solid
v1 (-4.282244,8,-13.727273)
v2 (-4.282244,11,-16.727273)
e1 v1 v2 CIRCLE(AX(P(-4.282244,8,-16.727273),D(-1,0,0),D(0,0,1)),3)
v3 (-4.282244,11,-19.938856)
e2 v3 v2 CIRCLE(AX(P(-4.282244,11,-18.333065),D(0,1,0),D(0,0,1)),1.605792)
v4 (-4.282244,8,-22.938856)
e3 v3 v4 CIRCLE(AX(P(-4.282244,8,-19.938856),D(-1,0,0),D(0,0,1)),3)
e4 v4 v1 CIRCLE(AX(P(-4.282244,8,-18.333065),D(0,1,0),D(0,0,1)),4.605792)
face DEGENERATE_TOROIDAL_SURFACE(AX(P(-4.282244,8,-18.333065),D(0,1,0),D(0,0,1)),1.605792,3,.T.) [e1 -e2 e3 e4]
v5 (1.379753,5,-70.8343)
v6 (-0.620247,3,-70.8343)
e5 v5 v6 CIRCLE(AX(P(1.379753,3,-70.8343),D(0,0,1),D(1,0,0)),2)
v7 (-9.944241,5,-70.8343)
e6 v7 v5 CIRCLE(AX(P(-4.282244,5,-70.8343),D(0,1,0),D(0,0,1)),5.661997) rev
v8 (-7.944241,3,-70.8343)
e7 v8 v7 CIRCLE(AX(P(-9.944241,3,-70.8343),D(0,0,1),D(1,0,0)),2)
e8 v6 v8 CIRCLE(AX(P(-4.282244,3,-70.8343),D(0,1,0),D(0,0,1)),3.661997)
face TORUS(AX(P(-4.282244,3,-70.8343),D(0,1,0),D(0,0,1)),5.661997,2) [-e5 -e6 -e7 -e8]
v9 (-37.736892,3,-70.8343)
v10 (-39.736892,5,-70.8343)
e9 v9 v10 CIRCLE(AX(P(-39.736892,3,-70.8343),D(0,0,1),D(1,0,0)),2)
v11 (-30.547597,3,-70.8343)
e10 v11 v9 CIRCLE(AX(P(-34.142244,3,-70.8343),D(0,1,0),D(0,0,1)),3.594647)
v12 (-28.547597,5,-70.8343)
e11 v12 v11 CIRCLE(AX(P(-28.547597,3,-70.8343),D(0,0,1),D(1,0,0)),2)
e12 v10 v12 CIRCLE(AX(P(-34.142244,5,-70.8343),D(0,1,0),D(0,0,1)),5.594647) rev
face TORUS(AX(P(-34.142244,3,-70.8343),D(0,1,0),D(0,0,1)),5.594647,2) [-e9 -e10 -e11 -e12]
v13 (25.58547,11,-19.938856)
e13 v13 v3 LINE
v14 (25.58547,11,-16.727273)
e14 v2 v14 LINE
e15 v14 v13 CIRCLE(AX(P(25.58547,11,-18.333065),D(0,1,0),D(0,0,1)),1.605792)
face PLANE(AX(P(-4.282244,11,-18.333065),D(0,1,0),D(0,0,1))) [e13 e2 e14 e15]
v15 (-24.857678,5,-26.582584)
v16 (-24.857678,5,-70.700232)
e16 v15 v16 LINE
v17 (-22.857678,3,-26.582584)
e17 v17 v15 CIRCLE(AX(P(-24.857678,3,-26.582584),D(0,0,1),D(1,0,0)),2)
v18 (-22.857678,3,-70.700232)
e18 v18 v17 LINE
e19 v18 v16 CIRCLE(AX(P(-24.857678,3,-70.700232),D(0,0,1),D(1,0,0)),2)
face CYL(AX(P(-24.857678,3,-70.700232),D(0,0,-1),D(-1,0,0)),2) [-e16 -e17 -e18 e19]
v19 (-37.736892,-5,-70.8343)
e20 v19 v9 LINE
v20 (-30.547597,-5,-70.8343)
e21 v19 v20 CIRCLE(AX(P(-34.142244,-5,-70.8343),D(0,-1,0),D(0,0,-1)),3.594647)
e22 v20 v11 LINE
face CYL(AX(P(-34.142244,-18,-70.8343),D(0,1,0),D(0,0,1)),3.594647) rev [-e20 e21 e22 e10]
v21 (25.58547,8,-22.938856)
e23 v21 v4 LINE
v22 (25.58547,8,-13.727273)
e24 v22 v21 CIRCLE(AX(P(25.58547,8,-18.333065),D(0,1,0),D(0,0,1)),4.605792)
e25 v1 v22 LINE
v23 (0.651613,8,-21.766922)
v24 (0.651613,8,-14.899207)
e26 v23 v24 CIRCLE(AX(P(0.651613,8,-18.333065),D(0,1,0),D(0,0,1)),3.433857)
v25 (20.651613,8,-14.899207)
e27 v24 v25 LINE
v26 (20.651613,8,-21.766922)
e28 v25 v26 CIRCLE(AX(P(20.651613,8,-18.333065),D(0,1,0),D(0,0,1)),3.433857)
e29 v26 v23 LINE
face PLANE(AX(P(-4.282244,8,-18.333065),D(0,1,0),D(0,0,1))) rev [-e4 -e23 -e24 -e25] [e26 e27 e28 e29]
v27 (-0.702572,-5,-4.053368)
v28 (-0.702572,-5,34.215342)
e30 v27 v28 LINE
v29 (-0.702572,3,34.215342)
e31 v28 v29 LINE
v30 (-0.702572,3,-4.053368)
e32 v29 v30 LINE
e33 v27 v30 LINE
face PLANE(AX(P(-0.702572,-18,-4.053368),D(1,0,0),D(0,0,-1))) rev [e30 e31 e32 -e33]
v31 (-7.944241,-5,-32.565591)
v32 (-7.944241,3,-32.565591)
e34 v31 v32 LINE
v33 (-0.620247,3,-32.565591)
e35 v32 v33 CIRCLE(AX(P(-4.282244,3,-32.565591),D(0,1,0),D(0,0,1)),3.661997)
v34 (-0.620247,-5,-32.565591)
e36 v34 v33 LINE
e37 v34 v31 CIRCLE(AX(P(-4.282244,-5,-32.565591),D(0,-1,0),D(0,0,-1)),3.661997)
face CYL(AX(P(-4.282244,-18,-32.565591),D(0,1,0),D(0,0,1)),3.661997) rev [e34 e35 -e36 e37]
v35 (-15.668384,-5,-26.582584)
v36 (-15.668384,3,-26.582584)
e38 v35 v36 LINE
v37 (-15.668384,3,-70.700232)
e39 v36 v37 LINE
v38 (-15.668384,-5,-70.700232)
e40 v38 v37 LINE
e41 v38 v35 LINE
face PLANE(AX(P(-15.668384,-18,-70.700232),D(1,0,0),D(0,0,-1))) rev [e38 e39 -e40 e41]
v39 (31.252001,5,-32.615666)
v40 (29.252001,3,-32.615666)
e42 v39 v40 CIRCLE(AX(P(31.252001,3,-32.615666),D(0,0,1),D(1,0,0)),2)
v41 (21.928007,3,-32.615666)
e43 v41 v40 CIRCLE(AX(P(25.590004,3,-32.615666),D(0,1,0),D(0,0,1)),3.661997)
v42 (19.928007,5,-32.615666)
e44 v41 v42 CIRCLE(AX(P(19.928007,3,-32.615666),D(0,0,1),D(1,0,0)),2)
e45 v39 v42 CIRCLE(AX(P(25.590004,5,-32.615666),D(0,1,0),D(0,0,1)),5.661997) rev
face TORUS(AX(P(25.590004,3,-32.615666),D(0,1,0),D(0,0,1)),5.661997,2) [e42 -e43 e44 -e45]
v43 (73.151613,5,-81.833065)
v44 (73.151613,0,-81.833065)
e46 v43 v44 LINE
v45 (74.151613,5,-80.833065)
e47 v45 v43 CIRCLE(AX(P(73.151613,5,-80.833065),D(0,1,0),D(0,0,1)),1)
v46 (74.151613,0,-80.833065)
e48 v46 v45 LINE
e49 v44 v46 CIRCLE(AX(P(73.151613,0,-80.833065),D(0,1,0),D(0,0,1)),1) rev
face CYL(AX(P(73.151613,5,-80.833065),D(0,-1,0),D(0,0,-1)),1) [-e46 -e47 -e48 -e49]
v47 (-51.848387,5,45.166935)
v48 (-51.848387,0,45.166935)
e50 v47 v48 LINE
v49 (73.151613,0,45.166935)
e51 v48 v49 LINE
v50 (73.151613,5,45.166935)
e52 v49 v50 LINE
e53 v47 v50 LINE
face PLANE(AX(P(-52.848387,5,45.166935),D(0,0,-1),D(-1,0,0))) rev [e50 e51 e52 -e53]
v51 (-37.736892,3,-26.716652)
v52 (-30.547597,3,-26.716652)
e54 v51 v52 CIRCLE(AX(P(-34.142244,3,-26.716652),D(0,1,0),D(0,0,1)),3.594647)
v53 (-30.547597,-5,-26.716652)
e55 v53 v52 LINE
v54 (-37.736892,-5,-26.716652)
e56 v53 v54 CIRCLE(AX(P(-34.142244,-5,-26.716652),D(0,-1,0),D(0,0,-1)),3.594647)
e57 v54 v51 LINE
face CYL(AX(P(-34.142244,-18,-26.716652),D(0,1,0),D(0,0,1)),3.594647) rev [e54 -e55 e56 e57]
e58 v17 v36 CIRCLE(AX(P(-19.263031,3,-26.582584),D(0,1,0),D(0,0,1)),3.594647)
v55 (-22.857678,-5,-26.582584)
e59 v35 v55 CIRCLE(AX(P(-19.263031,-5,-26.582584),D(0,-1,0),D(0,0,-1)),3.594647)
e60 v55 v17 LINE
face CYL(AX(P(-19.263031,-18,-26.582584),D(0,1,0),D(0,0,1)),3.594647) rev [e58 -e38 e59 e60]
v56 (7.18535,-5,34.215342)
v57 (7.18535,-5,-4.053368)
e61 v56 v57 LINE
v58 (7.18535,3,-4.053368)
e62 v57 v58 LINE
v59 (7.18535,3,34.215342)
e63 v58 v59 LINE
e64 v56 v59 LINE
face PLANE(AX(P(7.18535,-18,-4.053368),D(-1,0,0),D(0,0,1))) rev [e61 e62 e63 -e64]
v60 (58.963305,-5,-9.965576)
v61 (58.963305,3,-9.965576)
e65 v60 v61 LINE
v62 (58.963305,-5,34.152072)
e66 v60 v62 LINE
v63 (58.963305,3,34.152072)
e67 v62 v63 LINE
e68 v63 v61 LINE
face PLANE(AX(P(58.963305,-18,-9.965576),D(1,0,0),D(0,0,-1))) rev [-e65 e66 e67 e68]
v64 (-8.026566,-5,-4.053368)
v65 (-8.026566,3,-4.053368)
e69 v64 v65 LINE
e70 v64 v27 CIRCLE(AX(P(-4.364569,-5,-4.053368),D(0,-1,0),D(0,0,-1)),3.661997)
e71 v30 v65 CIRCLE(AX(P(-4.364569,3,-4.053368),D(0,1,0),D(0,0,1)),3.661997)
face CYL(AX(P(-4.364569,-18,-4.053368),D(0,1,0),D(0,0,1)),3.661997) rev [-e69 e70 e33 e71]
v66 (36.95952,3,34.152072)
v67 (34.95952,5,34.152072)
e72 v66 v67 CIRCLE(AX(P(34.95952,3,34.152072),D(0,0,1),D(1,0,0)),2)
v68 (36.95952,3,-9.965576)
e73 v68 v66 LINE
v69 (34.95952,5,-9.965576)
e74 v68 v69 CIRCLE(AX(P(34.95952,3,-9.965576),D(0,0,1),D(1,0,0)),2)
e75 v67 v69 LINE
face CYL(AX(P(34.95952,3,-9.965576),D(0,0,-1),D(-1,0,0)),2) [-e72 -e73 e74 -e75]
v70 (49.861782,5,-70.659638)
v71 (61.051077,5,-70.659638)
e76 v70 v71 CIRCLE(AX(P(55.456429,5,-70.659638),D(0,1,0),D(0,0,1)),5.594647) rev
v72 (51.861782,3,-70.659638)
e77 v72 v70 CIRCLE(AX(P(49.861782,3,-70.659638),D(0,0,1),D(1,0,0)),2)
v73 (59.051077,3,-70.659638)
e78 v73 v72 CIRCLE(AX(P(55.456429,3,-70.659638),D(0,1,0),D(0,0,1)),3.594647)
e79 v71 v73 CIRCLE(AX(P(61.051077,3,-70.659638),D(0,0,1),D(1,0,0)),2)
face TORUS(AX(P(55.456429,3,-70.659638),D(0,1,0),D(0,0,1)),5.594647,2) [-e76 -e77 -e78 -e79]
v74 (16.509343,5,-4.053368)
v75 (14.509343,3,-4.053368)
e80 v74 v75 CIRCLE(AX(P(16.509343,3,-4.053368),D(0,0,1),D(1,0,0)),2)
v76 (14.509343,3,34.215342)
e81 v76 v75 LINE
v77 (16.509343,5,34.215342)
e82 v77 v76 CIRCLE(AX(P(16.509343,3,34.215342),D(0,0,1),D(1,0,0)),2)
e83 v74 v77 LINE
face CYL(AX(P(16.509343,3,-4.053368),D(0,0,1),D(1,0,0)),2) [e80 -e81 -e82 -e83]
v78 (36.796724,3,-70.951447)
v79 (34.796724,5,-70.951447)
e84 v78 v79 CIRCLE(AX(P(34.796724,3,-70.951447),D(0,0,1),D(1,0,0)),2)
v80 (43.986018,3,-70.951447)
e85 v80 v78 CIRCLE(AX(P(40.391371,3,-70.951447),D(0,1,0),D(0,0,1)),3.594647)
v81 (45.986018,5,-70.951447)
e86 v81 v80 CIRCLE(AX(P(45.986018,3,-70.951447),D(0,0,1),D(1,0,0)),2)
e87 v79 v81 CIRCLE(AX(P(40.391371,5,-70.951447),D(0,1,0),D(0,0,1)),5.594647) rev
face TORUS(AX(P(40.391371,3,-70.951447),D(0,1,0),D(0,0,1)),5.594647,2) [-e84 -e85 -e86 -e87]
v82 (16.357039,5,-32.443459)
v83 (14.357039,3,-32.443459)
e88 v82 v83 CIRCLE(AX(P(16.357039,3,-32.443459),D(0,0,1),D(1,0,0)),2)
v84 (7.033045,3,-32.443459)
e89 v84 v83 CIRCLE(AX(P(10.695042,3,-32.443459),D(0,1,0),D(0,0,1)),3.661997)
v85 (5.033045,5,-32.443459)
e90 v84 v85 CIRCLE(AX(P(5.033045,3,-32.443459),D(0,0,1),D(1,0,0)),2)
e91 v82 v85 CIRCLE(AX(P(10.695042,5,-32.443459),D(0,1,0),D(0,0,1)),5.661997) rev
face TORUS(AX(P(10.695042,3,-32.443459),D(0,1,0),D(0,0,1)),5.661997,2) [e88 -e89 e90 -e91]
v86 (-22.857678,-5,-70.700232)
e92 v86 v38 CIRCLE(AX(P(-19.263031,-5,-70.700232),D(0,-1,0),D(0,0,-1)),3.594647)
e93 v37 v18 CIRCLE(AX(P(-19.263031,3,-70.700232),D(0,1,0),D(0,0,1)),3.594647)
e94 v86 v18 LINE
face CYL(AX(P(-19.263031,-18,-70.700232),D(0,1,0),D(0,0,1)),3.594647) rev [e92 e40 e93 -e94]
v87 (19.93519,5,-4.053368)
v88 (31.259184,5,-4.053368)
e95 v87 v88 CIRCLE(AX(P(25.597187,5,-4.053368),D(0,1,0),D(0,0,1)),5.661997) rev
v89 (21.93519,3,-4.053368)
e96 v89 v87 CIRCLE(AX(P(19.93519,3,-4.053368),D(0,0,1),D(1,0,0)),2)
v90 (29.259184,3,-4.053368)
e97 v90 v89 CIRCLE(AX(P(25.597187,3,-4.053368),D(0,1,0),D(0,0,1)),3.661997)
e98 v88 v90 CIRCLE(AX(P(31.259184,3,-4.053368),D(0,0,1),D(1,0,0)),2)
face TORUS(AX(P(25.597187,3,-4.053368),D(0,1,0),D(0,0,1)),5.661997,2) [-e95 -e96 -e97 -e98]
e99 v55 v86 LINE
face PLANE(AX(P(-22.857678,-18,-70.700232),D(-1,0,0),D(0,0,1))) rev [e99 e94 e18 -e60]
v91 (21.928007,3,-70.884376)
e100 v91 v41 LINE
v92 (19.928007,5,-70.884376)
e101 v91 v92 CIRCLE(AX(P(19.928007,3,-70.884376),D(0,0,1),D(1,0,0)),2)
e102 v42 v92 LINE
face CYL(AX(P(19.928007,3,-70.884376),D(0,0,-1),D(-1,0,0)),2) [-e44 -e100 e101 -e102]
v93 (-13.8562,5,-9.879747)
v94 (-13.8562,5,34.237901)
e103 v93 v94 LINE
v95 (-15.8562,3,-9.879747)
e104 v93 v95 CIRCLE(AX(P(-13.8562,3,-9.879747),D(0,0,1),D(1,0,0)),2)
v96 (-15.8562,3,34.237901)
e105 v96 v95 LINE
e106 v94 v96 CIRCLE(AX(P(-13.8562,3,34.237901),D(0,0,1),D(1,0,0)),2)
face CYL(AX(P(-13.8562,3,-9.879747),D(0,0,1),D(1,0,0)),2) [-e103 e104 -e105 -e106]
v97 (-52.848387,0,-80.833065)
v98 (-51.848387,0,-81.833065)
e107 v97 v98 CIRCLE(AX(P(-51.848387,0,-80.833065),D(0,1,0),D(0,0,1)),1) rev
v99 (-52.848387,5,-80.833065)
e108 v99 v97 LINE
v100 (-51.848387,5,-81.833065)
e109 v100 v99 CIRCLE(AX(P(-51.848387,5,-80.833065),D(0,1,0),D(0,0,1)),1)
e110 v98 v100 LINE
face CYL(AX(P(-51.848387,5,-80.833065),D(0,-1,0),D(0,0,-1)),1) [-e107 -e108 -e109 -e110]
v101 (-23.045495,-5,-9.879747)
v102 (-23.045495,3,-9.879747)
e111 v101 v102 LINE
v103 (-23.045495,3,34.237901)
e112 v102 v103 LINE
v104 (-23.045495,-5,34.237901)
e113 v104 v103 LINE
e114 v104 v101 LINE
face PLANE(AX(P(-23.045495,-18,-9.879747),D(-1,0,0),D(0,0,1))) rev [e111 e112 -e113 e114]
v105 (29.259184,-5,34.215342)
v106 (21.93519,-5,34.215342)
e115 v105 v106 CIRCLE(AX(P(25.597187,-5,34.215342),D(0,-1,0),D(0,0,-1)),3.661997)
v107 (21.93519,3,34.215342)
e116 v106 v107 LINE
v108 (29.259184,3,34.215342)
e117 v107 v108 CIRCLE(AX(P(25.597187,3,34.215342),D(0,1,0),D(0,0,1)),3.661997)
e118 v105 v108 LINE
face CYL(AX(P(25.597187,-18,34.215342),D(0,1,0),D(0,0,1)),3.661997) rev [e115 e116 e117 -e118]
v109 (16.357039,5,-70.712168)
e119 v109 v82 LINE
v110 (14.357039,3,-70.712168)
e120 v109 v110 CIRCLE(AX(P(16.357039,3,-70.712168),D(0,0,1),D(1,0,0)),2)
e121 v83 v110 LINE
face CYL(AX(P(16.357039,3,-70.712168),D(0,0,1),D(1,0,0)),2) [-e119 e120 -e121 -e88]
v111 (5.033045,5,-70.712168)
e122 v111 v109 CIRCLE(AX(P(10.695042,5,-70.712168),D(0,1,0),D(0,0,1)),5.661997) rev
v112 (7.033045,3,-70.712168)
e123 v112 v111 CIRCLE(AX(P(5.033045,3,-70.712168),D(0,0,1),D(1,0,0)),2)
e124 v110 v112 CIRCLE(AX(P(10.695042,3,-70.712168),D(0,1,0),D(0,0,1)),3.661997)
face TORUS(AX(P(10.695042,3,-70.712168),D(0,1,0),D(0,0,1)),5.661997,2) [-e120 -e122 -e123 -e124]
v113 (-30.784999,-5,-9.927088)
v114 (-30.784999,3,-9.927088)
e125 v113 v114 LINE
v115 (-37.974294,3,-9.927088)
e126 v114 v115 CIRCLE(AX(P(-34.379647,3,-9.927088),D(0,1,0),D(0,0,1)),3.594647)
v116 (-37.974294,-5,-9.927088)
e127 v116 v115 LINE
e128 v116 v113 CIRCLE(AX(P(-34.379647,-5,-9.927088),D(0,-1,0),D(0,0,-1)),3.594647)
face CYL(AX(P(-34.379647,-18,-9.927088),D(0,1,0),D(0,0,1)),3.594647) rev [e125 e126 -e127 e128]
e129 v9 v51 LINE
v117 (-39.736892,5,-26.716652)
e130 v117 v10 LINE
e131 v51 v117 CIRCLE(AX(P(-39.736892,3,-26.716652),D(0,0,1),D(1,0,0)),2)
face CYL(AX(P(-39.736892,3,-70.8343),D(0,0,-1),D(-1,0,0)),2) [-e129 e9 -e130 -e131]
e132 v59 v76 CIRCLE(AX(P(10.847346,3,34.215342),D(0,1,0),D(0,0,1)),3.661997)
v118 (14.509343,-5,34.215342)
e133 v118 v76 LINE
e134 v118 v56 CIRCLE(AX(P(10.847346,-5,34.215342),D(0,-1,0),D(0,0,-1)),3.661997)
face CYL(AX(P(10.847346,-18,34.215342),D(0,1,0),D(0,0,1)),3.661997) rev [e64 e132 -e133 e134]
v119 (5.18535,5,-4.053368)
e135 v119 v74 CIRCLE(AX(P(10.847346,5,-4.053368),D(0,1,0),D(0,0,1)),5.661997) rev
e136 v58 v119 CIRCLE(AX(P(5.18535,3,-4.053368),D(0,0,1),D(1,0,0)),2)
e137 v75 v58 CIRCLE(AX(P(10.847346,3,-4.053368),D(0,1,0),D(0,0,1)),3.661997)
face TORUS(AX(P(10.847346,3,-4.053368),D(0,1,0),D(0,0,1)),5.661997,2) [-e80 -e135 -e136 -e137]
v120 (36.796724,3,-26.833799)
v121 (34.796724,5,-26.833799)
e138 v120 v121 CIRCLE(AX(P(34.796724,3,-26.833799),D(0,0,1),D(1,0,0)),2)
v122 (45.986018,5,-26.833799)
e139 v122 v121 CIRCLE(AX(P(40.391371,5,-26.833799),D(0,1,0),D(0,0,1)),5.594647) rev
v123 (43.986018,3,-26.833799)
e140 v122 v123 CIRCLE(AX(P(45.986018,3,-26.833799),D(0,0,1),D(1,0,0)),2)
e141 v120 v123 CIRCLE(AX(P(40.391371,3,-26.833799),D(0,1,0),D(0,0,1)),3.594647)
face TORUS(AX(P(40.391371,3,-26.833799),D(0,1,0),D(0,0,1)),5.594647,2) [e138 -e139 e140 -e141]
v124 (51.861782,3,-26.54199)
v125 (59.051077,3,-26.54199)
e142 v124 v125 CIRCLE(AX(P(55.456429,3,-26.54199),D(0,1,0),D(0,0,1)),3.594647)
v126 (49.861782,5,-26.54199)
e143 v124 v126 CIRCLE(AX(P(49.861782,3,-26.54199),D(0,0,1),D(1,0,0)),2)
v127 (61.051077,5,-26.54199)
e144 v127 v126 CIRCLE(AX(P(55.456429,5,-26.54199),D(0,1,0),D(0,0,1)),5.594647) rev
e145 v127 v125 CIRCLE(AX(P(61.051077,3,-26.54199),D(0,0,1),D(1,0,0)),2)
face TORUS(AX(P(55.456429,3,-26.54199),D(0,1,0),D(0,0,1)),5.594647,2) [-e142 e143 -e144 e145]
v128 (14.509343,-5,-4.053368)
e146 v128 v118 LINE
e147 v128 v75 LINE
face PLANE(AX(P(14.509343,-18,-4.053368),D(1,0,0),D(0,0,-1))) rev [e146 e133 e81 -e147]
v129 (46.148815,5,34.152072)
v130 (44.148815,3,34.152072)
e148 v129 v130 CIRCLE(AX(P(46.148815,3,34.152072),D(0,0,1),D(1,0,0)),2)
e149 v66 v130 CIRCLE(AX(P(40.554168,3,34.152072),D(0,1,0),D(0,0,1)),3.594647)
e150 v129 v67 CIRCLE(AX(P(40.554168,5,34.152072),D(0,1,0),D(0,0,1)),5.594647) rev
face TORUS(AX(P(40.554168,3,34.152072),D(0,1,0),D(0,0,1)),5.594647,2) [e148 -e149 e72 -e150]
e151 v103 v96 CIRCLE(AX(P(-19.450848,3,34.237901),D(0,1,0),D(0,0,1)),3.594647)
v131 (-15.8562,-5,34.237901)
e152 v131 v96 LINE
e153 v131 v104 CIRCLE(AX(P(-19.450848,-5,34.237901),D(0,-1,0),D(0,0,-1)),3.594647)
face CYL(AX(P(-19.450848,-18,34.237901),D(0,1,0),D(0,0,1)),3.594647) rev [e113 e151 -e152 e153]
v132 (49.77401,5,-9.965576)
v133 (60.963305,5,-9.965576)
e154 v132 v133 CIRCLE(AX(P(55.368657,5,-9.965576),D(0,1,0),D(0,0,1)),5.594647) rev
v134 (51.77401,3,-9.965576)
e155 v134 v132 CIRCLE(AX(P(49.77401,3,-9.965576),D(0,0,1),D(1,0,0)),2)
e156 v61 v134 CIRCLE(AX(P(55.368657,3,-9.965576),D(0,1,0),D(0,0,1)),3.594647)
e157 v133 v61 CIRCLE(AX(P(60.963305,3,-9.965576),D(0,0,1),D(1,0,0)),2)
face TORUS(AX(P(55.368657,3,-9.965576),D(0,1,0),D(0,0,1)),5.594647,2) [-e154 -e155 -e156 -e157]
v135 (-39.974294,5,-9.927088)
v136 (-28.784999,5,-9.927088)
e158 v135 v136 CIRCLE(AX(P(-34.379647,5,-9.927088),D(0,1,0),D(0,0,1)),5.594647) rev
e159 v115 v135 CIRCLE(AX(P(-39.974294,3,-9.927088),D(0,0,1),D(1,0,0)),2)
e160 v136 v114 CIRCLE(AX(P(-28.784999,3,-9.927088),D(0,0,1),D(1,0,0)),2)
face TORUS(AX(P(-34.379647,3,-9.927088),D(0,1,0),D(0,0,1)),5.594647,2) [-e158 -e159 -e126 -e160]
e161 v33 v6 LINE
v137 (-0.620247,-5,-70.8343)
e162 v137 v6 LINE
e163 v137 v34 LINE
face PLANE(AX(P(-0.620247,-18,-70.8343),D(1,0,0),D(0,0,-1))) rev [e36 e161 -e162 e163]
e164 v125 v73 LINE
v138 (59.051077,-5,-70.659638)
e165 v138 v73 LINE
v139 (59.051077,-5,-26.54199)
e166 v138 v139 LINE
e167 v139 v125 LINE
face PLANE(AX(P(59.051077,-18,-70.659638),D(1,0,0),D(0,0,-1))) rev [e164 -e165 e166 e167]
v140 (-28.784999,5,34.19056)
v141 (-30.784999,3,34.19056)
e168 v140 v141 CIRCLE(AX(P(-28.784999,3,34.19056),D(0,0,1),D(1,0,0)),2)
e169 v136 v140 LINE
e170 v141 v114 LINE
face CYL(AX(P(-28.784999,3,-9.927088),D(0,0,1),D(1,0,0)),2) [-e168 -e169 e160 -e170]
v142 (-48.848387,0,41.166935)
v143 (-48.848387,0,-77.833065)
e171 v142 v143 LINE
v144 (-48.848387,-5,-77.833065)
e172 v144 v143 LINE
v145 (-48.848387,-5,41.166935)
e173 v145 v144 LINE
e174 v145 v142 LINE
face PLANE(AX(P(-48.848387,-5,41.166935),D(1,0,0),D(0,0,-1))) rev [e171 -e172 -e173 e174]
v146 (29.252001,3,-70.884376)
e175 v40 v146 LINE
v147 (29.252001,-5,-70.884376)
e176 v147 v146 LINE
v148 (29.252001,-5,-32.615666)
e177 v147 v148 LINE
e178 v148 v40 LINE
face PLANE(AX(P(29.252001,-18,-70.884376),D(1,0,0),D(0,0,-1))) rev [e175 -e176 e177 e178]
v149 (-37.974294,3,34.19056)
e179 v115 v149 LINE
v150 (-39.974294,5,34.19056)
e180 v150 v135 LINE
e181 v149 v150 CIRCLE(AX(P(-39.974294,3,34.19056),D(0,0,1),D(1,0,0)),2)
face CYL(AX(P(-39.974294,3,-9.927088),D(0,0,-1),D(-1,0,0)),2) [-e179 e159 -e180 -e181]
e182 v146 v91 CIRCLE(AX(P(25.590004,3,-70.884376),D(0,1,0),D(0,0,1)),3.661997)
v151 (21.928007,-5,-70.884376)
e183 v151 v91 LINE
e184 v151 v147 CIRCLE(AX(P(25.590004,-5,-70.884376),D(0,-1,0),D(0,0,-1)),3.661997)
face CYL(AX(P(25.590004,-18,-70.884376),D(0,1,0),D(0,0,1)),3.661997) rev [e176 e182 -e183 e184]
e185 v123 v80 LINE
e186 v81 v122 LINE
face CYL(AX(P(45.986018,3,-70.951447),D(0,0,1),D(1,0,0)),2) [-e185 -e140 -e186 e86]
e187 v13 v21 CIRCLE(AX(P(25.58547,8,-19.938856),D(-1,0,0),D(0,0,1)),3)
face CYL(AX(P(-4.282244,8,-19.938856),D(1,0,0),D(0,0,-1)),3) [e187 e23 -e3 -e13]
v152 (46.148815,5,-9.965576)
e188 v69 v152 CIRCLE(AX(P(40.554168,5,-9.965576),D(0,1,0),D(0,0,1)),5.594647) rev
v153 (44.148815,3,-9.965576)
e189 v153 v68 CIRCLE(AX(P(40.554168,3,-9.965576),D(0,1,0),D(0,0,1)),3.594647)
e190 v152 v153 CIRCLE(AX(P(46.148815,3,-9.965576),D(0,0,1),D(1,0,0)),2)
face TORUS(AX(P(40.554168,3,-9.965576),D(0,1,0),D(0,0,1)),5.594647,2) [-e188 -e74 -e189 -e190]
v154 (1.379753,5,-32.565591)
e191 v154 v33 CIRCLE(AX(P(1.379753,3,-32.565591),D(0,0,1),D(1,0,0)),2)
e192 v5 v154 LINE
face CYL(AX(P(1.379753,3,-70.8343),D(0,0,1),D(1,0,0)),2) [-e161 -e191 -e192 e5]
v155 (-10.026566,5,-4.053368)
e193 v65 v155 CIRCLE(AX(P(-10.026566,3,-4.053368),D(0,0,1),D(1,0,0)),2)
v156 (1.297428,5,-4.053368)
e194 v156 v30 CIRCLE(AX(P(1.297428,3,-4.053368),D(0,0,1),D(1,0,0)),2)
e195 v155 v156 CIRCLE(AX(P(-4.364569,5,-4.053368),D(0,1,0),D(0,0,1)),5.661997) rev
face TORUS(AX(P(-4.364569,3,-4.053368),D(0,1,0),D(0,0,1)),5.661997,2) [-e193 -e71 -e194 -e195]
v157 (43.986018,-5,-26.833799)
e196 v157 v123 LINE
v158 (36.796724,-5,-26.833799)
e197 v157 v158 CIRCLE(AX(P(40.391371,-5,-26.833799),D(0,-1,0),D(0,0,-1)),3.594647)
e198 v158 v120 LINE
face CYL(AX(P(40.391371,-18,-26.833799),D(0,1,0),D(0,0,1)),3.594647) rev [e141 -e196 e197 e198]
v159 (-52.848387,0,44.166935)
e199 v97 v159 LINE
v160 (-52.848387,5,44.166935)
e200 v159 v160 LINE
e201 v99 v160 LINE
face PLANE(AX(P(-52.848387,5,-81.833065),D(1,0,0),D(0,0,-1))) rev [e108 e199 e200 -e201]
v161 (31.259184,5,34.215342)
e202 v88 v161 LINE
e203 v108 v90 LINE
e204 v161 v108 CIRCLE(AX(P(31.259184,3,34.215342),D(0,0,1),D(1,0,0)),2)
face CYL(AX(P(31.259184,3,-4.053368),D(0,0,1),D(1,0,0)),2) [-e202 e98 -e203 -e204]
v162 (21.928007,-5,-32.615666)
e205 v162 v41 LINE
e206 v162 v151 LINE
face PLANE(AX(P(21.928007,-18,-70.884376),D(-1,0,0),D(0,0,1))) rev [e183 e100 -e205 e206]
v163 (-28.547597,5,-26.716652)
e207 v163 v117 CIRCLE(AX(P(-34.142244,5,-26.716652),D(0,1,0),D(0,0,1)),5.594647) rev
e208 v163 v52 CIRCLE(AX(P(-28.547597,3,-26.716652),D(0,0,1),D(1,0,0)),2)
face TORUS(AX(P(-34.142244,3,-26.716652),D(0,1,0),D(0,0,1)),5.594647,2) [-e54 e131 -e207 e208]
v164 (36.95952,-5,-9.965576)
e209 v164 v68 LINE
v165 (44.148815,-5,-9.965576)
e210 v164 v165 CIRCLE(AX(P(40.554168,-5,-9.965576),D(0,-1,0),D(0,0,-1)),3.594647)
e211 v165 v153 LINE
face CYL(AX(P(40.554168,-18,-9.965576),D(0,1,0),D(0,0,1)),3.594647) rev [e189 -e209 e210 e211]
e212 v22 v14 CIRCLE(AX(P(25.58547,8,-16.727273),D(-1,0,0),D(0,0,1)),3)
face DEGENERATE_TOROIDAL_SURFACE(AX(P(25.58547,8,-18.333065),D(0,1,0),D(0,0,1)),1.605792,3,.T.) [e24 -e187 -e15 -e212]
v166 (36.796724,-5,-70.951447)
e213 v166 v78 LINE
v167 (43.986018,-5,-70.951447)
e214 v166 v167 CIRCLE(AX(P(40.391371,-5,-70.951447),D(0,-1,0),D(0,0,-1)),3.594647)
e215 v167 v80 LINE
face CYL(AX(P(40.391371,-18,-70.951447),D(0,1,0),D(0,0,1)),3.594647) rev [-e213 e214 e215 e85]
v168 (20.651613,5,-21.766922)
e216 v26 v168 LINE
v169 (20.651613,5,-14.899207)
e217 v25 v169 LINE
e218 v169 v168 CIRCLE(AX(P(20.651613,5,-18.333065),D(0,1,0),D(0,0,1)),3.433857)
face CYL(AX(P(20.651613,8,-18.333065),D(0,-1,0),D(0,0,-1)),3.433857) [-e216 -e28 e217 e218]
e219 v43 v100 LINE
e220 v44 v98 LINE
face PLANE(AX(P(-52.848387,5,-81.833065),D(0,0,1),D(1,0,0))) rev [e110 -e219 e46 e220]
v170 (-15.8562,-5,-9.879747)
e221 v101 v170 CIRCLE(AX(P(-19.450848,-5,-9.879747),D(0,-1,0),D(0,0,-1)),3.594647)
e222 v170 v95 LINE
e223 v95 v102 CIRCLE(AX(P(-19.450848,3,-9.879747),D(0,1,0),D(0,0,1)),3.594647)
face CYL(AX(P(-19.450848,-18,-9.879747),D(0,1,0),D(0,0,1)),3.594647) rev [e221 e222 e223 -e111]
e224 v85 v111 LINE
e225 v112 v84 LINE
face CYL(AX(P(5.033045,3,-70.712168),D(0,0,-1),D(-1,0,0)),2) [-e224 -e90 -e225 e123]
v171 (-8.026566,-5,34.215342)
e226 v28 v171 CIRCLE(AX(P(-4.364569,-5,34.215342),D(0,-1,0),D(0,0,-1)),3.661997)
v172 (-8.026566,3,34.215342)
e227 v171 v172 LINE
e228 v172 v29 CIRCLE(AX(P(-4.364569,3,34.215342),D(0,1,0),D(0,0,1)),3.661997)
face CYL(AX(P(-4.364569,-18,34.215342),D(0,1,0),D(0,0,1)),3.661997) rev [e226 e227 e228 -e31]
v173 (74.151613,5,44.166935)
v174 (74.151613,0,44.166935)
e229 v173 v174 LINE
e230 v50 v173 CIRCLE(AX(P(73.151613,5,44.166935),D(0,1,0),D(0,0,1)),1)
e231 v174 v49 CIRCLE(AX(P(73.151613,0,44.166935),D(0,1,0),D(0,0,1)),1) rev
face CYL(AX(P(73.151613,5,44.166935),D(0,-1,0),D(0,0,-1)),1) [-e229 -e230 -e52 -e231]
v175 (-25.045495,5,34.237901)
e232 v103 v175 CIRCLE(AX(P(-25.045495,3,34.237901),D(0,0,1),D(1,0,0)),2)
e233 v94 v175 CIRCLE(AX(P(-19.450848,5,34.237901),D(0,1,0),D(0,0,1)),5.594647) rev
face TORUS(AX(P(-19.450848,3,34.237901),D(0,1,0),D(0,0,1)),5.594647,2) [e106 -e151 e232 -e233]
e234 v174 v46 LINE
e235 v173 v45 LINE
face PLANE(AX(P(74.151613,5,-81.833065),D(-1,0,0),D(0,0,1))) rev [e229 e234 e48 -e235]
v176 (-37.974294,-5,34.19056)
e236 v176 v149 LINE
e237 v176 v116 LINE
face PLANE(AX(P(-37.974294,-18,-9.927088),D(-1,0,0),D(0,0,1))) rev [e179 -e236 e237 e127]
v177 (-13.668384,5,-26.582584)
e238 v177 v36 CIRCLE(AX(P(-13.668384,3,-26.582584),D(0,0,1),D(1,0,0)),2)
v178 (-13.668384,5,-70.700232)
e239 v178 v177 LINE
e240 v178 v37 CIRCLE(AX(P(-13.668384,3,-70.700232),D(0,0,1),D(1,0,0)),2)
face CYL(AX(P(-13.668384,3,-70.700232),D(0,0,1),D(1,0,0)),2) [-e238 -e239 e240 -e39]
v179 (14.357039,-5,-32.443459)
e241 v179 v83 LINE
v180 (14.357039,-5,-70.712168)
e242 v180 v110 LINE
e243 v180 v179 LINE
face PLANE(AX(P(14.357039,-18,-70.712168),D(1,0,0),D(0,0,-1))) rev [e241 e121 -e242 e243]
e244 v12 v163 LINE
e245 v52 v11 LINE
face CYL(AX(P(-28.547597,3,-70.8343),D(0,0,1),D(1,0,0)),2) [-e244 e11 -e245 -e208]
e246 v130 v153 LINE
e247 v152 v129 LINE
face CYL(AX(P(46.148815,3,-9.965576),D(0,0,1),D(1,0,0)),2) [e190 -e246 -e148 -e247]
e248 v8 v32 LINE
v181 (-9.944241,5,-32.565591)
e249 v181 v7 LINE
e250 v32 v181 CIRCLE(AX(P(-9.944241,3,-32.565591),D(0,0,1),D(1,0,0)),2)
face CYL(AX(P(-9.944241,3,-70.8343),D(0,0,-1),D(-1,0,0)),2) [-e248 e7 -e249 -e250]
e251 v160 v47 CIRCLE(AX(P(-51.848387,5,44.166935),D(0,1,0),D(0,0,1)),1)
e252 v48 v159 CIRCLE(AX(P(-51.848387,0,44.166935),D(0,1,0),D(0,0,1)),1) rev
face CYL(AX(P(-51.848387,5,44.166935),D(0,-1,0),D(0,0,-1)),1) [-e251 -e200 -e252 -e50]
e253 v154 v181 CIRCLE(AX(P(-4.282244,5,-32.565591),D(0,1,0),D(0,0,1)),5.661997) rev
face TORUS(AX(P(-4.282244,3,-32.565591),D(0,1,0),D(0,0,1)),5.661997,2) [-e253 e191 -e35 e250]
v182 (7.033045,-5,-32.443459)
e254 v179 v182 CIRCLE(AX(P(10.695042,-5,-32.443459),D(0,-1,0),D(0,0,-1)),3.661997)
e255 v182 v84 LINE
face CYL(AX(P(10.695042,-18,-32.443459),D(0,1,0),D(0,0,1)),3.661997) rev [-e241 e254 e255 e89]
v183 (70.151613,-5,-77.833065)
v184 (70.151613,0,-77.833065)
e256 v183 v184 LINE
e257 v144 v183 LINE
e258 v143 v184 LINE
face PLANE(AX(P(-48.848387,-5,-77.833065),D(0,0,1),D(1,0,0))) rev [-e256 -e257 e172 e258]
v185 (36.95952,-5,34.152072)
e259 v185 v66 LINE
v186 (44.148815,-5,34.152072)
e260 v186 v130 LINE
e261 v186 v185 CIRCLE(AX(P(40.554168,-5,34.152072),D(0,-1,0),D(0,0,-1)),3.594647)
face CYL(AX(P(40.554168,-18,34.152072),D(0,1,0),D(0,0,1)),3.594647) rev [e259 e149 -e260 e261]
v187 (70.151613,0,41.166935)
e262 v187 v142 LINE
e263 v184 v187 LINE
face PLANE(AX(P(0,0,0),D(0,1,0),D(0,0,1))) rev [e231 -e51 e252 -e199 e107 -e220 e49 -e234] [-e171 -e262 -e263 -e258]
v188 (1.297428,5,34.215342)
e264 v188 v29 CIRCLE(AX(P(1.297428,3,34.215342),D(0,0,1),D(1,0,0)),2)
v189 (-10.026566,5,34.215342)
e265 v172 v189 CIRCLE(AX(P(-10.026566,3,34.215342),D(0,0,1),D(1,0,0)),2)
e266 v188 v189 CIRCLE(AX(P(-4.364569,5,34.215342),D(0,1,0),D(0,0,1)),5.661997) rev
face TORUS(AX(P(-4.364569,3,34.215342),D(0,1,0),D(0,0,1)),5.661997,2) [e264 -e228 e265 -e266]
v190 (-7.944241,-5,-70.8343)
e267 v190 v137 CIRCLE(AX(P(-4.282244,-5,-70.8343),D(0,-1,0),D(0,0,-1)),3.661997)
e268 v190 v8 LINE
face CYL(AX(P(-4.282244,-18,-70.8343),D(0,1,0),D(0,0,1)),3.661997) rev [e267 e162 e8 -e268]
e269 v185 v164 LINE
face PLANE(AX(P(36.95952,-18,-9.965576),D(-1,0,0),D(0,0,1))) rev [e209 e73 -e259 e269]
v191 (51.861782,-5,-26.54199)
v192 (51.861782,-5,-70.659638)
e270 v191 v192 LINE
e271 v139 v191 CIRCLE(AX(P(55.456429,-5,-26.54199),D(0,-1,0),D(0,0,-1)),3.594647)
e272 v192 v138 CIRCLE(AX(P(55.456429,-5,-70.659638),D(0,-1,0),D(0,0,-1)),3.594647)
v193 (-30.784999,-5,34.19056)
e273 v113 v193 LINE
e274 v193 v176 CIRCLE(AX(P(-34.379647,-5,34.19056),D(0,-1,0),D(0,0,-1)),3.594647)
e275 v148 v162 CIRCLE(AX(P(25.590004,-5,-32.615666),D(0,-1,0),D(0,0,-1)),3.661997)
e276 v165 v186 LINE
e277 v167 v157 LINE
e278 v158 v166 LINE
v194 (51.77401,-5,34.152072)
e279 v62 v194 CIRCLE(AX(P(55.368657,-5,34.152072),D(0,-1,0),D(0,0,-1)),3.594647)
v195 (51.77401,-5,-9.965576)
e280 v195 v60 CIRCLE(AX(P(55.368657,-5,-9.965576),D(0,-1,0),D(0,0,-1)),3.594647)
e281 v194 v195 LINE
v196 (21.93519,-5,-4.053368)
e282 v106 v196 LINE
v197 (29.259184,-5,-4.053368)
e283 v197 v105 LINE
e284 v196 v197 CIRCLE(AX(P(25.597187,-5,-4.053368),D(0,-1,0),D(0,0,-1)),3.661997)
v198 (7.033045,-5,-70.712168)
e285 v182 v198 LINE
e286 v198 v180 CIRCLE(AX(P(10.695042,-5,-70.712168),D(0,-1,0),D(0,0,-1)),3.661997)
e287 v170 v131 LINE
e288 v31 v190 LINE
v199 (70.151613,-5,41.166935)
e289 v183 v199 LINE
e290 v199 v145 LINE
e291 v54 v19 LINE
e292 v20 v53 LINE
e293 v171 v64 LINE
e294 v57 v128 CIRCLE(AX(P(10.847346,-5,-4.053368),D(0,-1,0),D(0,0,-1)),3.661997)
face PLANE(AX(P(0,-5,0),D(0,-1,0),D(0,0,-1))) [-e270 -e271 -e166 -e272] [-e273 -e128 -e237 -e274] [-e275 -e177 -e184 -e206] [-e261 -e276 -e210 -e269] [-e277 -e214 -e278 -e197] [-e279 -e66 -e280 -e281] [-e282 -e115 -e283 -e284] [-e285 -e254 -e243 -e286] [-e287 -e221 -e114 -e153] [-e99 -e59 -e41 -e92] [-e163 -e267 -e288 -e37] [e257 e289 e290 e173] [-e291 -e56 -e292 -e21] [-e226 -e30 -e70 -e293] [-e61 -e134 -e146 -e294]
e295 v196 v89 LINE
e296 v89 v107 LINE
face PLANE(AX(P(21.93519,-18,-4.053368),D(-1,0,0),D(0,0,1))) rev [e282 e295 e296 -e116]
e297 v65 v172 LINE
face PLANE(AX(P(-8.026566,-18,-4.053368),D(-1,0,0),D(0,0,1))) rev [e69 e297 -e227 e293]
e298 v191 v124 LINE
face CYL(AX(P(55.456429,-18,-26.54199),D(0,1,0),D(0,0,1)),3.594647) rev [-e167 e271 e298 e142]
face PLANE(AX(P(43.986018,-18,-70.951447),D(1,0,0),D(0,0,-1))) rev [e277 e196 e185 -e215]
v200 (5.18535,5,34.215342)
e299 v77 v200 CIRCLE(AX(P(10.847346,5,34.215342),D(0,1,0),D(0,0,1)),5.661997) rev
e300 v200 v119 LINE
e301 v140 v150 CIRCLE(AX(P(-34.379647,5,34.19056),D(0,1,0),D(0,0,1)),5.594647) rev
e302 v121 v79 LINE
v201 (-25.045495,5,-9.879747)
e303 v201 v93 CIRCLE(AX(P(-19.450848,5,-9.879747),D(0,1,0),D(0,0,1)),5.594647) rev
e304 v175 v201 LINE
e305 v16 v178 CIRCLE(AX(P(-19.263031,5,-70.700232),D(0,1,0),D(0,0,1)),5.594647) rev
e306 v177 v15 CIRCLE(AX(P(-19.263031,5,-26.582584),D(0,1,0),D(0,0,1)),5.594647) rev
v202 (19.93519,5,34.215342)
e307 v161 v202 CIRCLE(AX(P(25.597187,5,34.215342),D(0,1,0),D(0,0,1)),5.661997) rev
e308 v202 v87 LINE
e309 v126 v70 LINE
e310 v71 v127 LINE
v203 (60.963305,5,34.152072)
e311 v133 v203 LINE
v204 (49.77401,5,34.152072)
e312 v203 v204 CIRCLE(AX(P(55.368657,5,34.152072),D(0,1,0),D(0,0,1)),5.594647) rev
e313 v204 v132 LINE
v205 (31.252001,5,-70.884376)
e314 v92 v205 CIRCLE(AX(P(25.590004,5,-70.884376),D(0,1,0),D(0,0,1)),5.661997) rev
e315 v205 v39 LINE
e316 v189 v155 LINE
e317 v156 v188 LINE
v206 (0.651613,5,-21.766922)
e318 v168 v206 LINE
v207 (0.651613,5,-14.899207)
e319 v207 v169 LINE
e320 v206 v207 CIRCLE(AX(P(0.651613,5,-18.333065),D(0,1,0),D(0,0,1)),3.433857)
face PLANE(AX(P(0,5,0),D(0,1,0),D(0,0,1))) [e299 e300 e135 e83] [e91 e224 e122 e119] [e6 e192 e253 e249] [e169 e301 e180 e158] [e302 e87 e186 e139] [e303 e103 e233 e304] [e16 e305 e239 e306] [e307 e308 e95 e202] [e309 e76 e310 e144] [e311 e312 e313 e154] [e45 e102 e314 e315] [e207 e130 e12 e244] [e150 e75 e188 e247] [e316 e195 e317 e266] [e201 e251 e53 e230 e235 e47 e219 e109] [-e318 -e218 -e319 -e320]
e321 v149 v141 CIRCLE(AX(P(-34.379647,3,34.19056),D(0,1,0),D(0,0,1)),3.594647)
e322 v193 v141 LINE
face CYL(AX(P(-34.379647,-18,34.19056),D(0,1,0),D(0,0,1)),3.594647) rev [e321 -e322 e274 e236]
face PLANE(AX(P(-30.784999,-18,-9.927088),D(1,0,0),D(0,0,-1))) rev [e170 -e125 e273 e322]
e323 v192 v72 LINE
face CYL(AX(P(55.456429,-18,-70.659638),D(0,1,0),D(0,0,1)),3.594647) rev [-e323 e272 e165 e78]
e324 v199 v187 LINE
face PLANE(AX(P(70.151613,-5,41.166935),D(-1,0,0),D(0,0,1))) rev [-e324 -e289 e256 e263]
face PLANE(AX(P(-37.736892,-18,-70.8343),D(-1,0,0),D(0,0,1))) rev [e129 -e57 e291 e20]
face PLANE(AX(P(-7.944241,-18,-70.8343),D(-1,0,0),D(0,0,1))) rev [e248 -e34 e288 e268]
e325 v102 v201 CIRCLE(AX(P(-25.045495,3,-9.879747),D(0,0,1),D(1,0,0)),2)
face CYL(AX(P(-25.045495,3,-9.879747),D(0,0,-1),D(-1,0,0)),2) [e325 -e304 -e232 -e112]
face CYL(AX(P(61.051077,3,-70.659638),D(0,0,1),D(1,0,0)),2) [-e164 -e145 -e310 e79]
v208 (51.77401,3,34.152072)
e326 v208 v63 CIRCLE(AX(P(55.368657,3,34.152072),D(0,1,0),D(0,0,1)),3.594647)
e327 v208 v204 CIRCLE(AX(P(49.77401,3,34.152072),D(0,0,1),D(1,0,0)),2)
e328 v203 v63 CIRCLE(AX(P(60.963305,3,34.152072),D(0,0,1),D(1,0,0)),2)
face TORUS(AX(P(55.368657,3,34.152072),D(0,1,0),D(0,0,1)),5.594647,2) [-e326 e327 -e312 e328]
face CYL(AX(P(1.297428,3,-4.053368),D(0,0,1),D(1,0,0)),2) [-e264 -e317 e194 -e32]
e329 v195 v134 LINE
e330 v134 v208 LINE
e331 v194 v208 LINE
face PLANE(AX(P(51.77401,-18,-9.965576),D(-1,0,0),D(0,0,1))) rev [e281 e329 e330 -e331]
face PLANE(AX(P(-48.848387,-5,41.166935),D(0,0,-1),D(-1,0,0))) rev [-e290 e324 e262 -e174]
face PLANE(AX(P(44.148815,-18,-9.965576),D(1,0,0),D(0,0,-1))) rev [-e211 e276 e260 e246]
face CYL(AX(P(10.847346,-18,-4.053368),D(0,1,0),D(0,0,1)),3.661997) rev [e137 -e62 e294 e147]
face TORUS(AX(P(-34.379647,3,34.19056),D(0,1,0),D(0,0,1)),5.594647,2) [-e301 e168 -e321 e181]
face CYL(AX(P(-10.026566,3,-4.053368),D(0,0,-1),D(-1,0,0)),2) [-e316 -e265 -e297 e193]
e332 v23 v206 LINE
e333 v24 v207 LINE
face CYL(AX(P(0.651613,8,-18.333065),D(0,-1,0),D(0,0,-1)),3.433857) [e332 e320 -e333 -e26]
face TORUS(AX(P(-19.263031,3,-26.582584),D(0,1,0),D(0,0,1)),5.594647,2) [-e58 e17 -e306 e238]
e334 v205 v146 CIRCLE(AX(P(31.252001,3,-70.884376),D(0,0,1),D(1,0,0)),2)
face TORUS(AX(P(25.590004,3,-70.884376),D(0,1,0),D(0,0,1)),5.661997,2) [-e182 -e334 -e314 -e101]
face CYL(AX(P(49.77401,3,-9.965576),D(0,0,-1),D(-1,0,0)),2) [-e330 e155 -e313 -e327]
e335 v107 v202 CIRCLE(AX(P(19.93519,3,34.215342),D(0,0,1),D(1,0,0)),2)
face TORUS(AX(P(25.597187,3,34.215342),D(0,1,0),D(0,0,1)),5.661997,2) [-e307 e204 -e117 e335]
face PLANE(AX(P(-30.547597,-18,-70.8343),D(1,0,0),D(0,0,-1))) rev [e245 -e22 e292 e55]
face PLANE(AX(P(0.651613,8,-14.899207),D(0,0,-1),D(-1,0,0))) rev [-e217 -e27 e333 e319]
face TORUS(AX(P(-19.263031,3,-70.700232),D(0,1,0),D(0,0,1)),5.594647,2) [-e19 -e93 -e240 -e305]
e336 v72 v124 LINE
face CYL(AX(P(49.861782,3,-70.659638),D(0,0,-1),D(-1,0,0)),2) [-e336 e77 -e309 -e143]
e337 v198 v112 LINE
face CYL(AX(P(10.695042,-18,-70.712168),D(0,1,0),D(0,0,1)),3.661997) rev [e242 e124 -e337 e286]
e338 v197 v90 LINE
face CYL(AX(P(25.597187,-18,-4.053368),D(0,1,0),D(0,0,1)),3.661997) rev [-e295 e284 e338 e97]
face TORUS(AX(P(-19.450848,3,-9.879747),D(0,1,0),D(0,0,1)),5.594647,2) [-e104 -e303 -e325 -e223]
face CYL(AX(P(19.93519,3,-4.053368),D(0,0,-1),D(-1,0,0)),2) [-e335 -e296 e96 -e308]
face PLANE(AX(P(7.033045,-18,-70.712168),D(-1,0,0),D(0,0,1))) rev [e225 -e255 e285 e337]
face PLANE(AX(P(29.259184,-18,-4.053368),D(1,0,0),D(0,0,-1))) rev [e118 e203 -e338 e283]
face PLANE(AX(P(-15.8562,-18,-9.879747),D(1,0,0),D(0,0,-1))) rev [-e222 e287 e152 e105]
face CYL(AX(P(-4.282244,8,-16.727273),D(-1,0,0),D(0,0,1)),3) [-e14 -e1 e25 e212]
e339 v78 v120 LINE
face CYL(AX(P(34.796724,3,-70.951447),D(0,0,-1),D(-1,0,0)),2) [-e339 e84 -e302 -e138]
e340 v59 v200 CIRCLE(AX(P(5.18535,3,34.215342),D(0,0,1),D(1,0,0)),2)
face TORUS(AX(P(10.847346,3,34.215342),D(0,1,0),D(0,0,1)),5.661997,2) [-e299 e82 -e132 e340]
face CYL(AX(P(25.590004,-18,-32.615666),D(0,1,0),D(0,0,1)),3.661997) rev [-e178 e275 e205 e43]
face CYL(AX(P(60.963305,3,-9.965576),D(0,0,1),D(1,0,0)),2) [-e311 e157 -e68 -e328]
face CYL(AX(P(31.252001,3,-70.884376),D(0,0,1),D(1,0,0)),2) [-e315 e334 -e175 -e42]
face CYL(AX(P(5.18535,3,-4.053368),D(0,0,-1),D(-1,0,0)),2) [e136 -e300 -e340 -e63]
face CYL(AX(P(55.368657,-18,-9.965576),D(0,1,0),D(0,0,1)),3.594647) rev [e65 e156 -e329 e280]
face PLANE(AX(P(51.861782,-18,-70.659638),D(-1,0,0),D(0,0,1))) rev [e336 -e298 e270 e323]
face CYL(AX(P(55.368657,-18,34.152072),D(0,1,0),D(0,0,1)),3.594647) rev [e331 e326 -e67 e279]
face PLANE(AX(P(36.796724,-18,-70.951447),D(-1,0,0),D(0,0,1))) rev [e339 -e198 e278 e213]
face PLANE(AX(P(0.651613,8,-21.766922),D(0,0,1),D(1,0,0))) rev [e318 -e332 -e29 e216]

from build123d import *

# Parameters (mm, degrees)
SKETCH2_W           = 127
SKETCH2_H           = 127
BOSS_EXTRUDE1_DEPTH = 5
SKETCH3_W           = 119
SKETCH3_H           = 119
BOSS_EXTRUDE2_DEPTH = 5
FILLET1_R           = 1
BOSS_EXTRUDE3_DEPTH = 3
BOSS_EXTRUDE4_DEPTH = 3
FILLET2_R           = 3
CUT_EXTRUDE1_DEPTH  = 23
FILLET3_R           = 2


with BuildPart() as part:
    # Sketch2 → Boss-Extrude1 (new body)
    with BuildSketch(Plane(origin=(0, 0, 0), x_dir=(1, 0, 0), z_dir=(0, 1, 0))):
        with Locations((10.651612903, 18.333064516)):
            Rectangle(SKETCH2_W, SKETCH2_H)
    extrude(amount=BOSS_EXTRUDE1_DEPTH)

    # Sketch3 → Boss-Extrude2 (add)
    with BuildSketch(Plane.XZ):
        with Locations((10.651612903, -18.333064516)):
            Rectangle(SKETCH3_W, SKETCH3_H)
    extrude(amount=BOSS_EXTRUDE2_DEPTH)

    # Fillet1
    fillet1_edges = [part.edges().sort_by_distance(p)[0] for p in [
        (-52.848387097, 2.5, -81.833064516),
        (74.151612903, 2.5, -81.833064516),
        (74.151612903, 2.5, 45.166935484),
        (-52.848387097, 2.5, 45.166935484),
    ]]
    fillet(fillet1_edges, radius=FILLET1_R)

    # Sketch4 → Boss-Extrude3 (add)
    with BuildSketch(Plane(origin=(0, 5, 0), x_dir=(1, 0, 0), z_dir=(0, 1, 0))):
        with BuildLine():
            Line((0.651612903, 21.766921577), (20.651612903, 21.766921577))
            ThreePointArc((20.651612903, 21.766921577), (24.085469965, 18.333064516), (20.651612903, 14.899207455))
            Line((20.651612903, 14.899207455), (0.651612903, 14.899207455))
            ThreePointArc((0.651612903, 14.899207455), (-2.782244158, 18.333064516), (0.651612903, 21.766921577))
        make_face()
    extrude(amount=BOSS_EXTRUDE3_DEPTH)

    # Sketch5 → Boss-Extrude4 (add)
    with BuildSketch(Plane(origin=(0, 8, 0), x_dir=(1, 0, 0), z_dir=(0, 1, 0))):
        with BuildLine():
            Line((-4.282244158, 22.938856154), (25.585469965, 22.938856154))
            ThreePointArc((25.585469965, 22.938856154), (30.191261602, 18.333064516), (25.585469965, 13.727272878))
            Line((25.585469965, 13.727272878), (-4.282244158, 13.727272878))
            ThreePointArc((-4.282244158, 13.727272878), (-8.888035796, 18.333064516), (-4.282244158, 22.938856154))
        make_face()
    extrude(amount=BOSS_EXTRUDE4_DEPTH)

    # Fillet2
    fillet2_edges = [part.edges().sort_by_distance(p)[0] for p in [
        (-8.888035796, 11, -18.333064516),
        (10.651612903, 11, -22.938856154),
        (30.191261602, 11, -18.333064516),
        (10.651612903, 11, -13.727272878),
    ]]
    fillet(fillet2_edges, radius=FILLET2_R - 0.0001)  # a hair under: the kernel refuses the full size

    # Sketch6 → Cut-Extrude1 (cut)
    with BuildSketch(Plane(origin=(0, 5, 0), x_dir=(1, 0, 0), z_dir=(0, 1, 0))):
        with BuildLine():
            Line((-30.54759674, 70.834300294), (-30.54759674, 26.716652323))
            ThreePointArc((-30.54759674, 26.716652323), (-34.142244158, 23.122004906), (-37.736891576, 26.716652323))
            Line((-37.736891576, 26.716652323), (-37.736891576, 70.834300294))
            ThreePointArc((-37.736891576, 70.834300294), (-34.142244158, 74.428947712), (-30.54759674, 70.834300294))
        make_face()
        with BuildLine():
            Line((-15.668383644, 70.700231666), (-15.668383644, 26.582583695))
            ThreePointArc((-15.668383644, 26.582583695), (-19.263031062, 22.987936277), (-22.857678479, 26.582583695))
            Line((-22.857678479, 26.582583695), (-22.857678479, 70.700231666))
            ThreePointArc((-22.857678479, 70.700231666), (-19.263031062, 74.294879084), (-15.668383644, 70.700231666))
        make_face()
        with BuildLine():
            Line((43.986018434, 70.951447075), (43.986018434, 26.833799104))
            ThreePointArc((43.986018434, 26.833799104), (40.391371017, 23.239151686), (36.796723599, 26.833799104))
            Line((36.796723599, 26.833799104), (36.796723599, 70.951447075))
            ThreePointArc((36.796723599, 70.951447075), (40.391371017, 74.546094493), (43.986018434, 70.951447075))
        make_face()
        with BuildLine():
            Line((59.051076502, 70.659638364), (59.051076502, 26.541990393))
            ThreePointArc((59.051076502, 26.541990393), (55.456429084, 22.947342975), (51.861781666, 26.541990393))
            Line((51.861781666, 26.541990393), (51.861781666, 70.659638364))
            ThreePointArc((51.861781666, 70.659638364), (55.456429084, 74.254285782), (59.051076502, 70.659638364))
        make_face()
        with BuildLine():
            Line((-30.784999095, 9.927087611), (-30.784999095, -34.19056036))
            ThreePointArc((-30.784999095, -34.19056036), (-34.379646512, -37.785207778), (-37.97429393, -34.19056036))
            Line((-37.97429393, -34.19056036), (-37.97429393, 9.927087611))
            ThreePointArc((-37.97429393, 9.927087611), (-34.379646512, 13.521735029), (-30.784999095, 9.927087611))
        make_face()
        with BuildLine():
            Line((-15.856200447, 9.879746798), (-15.856200447, -34.237901173))
            ThreePointArc((-15.856200447, -34.237901173), (-19.450847865, -37.832548591), (-23.045495283, -34.237901173))
            Line((-23.045495283, -34.237901173), (-23.045495283, 9.879746798))
            ThreePointArc((-23.045495283, 9.879746798), (-19.450847865, 13.474394216), (-15.856200447, 9.879746798))
        make_face()
        with BuildLine():
            Line((44.148815025, 9.965576219), (44.148815025, -34.152071752))
            ThreePointArc((44.148815025, -34.152071752), (40.554167607, -37.74671917), (36.959520189, -34.152071752))
            Line((36.959520189, -34.152071752), (36.959520189, 9.965576219))
            ThreePointArc((36.959520189, 9.965576219), (40.554167607, 13.560223637), (44.148815025, 9.965576219))
        make_face()
        with BuildLine():
            Line((58.963304753, 9.965576219), (58.963304753, -34.152071752))
            ThreePointArc((58.963304753, -34.152071752), (55.368657335, -37.74671917), (51.774009917, -34.152071752))
            Line((51.774009917, -34.152071752), (51.774009917, 9.965576219))
            ThreePointArc((51.774009917, 9.965576219), (55.368657335, 13.560223637), (58.963304753, 9.965576219))
        make_face()
        with BuildLine():
            Line((-0.620247341, 70.834300294), (-0.620247341, 32.565590672))
            ThreePointArc((-0.620247341, 32.565590672), (-4.282244158, 28.903593855), (-7.944240975, 32.565590672))
            Line((-7.944240975, 32.565590672), (-7.944240975, 70.834300294))
            ThreePointArc((-7.944240975, 70.834300294), (-4.282244158, 74.496297111), (-0.620247341, 70.834300294))
        make_face()
        with BuildLine():
            Line((14.357038978, 70.712168219), (14.357038978, 32.443458596))
            ThreePointArc((14.357038978, 32.443458596), (10.695042161, 28.78146178), (7.033045344, 32.443458596))
            Line((7.033045344, 32.443458596), (7.033045344, 70.712168219))
            ThreePointArc((7.033045344, 70.712168219), (10.695042161, 74.374165036), (14.357038978, 70.712168219))
        make_face()
        with BuildLine():
            Line((29.252000533, 70.88437608), (29.252000533, 32.615666457))
            ThreePointArc((29.252000533, 32.615666457), (25.590003717, 28.953669641), (21.9280069, 32.615666457))
            Line((21.9280069, 32.615666457), (21.9280069, 70.88437608))
            ThreePointArc((21.9280069, 70.88437608), (25.590003717, 74.546372897), (29.252000533, 70.88437608))
        make_face()
        with BuildLine():
            Line((-0.702572104, 4.053367853), (-0.702572104, -34.215341769))
            ThreePointArc((-0.702572104, -34.215341769), (-4.364568921, -37.877338586), (-8.026565738, -34.215341769))
            Line((-8.026565738, -34.215341769), (-8.026565738, 4.053367853))
            ThreePointArc((-8.026565738, 4.053367853), (-4.364568921, 7.71536467), (-0.702572104, 4.053367853))
        make_face()
        with BuildLine():
            Line((14.50934326, 4.053367853), (14.50934326, -34.215341769))
            ThreePointArc((14.50934326, -34.215341769), (10.847346444, -37.877338586), (7.185349627, -34.215341769))
            Line((7.185349627, -34.215341769), (7.185349627, 4.053367853))
            ThreePointArc((7.185349627, 4.053367853), (10.847346444, 7.71536467), (14.50934326, 4.053367853))
        make_face()
        with BuildLine():
            Line((29.259184132, 4.053367853), (29.259184132, -34.215341769))
            ThreePointArc((29.259184132, -34.215341769), (25.597187315, -37.877338586), (21.935190498, -34.215341769))
            Line((21.935190498, -34.215341769), (21.935190498, 4.053367853))
            ThreePointArc((21.935190498, 4.053367853), (25.597187315, 7.71536467), (29.259184132, 4.053367853))
        make_face()
    extrude(amount=-CUT_EXTRUDE1_DEPTH, mode=Mode.SUBTRACT)

    # Fillet3
    fillet3_edges = [part.edges().sort_by_distance(p)[0] for p in [
        (-19.450847865, 5, -13.474394216),
        (-23.045495283, 5, 12.179077188),
        (-19.450847865, 5, 37.832548591),
        (-15.856200447, 5, 12.179077188),
        (40.554167607, 5, -13.560223637),
        (36.959520189, 5, 12.093247766),
        (40.554167607, 5, 37.74671917),
        (44.148815025, 5, 12.093247766),
        (55.368657335, 5, -13.560223637),
        (51.774009917, 5, 12.093247766),
        (55.368657335, 5, 37.74671917),
        (58.963304753, 5, 12.093247766),
        (-4.282244158, 5, -74.496297111),
        (-7.944240975, 5, -51.699945483),
        (-4.282244158, 5, -28.903593855),
        (-0.620247341, 5, -51.699945483),
        (-19.263031062, 5, -74.294879084),
        (-22.857678479, 5, -48.641407681),
        (-19.263031062, 5, -22.987936277),
        (-15.668383644, 5, -48.641407681),
        (40.391371017, 5, -74.546094493),
        (36.796723599, 5, -48.89262309),
        (40.391371017, 5, -23.239151686),
        (43.986018434, 5, -48.89262309),
        (55.456429084, 5, -74.254285782),
        (51.861781666, 5, -48.600814378),
        (55.456429084, 5, -22.947342975),
        (59.051076502, 5, -48.600814378),
        (-34.379646512, 5, -13.521735029),
        (-37.97429393, 5, 12.131736374),
        (-34.379646512, 5, 37.785207778),
        (-30.784999095, 5, 12.131736374),
        (25.597187315, 5, -7.71536467),
        (21.935190498, 5, 15.080986958),
        (25.597187315, 5, 37.877338586),
        (29.259184132, 5, 15.080986958),
        (10.847346444, 5, -7.71536467),
        (7.185349627, 5, 15.080986958),
        (10.847346444, 5, 37.877338586),
        (14.50934326, 5, 15.080986958),
        (-4.364568921, 5, -7.71536467),
        (-8.026565738, 5, 15.080986958),
        (-4.364568921, 5, 37.877338586),
        (-0.702572104, 5, 15.080986958),
        (25.590003717, 5, -74.546372897),
        (21.9280069, 5, -51.750021269),
        (25.590003717, 5, -28.953669641),
        (29.252000533, 5, -51.750021269),
        (10.695042161, 5, -74.374165036),
        (7.033045344, 5, -51.577813408),
        (10.695042161, 5, -28.78146178),
        (14.357038978, 5, -51.577813408),
        (-34.142244158, 5, -74.428947712),
        (-37.736891576, 5, -48.775476309),
        (-34.142244158, 5, -23.122004906),
        (-30.54759674, 5, -48.775476309),
    ]]
    fillet(fillet3_edges, radius=FILLET3_R)


solid = part.part
